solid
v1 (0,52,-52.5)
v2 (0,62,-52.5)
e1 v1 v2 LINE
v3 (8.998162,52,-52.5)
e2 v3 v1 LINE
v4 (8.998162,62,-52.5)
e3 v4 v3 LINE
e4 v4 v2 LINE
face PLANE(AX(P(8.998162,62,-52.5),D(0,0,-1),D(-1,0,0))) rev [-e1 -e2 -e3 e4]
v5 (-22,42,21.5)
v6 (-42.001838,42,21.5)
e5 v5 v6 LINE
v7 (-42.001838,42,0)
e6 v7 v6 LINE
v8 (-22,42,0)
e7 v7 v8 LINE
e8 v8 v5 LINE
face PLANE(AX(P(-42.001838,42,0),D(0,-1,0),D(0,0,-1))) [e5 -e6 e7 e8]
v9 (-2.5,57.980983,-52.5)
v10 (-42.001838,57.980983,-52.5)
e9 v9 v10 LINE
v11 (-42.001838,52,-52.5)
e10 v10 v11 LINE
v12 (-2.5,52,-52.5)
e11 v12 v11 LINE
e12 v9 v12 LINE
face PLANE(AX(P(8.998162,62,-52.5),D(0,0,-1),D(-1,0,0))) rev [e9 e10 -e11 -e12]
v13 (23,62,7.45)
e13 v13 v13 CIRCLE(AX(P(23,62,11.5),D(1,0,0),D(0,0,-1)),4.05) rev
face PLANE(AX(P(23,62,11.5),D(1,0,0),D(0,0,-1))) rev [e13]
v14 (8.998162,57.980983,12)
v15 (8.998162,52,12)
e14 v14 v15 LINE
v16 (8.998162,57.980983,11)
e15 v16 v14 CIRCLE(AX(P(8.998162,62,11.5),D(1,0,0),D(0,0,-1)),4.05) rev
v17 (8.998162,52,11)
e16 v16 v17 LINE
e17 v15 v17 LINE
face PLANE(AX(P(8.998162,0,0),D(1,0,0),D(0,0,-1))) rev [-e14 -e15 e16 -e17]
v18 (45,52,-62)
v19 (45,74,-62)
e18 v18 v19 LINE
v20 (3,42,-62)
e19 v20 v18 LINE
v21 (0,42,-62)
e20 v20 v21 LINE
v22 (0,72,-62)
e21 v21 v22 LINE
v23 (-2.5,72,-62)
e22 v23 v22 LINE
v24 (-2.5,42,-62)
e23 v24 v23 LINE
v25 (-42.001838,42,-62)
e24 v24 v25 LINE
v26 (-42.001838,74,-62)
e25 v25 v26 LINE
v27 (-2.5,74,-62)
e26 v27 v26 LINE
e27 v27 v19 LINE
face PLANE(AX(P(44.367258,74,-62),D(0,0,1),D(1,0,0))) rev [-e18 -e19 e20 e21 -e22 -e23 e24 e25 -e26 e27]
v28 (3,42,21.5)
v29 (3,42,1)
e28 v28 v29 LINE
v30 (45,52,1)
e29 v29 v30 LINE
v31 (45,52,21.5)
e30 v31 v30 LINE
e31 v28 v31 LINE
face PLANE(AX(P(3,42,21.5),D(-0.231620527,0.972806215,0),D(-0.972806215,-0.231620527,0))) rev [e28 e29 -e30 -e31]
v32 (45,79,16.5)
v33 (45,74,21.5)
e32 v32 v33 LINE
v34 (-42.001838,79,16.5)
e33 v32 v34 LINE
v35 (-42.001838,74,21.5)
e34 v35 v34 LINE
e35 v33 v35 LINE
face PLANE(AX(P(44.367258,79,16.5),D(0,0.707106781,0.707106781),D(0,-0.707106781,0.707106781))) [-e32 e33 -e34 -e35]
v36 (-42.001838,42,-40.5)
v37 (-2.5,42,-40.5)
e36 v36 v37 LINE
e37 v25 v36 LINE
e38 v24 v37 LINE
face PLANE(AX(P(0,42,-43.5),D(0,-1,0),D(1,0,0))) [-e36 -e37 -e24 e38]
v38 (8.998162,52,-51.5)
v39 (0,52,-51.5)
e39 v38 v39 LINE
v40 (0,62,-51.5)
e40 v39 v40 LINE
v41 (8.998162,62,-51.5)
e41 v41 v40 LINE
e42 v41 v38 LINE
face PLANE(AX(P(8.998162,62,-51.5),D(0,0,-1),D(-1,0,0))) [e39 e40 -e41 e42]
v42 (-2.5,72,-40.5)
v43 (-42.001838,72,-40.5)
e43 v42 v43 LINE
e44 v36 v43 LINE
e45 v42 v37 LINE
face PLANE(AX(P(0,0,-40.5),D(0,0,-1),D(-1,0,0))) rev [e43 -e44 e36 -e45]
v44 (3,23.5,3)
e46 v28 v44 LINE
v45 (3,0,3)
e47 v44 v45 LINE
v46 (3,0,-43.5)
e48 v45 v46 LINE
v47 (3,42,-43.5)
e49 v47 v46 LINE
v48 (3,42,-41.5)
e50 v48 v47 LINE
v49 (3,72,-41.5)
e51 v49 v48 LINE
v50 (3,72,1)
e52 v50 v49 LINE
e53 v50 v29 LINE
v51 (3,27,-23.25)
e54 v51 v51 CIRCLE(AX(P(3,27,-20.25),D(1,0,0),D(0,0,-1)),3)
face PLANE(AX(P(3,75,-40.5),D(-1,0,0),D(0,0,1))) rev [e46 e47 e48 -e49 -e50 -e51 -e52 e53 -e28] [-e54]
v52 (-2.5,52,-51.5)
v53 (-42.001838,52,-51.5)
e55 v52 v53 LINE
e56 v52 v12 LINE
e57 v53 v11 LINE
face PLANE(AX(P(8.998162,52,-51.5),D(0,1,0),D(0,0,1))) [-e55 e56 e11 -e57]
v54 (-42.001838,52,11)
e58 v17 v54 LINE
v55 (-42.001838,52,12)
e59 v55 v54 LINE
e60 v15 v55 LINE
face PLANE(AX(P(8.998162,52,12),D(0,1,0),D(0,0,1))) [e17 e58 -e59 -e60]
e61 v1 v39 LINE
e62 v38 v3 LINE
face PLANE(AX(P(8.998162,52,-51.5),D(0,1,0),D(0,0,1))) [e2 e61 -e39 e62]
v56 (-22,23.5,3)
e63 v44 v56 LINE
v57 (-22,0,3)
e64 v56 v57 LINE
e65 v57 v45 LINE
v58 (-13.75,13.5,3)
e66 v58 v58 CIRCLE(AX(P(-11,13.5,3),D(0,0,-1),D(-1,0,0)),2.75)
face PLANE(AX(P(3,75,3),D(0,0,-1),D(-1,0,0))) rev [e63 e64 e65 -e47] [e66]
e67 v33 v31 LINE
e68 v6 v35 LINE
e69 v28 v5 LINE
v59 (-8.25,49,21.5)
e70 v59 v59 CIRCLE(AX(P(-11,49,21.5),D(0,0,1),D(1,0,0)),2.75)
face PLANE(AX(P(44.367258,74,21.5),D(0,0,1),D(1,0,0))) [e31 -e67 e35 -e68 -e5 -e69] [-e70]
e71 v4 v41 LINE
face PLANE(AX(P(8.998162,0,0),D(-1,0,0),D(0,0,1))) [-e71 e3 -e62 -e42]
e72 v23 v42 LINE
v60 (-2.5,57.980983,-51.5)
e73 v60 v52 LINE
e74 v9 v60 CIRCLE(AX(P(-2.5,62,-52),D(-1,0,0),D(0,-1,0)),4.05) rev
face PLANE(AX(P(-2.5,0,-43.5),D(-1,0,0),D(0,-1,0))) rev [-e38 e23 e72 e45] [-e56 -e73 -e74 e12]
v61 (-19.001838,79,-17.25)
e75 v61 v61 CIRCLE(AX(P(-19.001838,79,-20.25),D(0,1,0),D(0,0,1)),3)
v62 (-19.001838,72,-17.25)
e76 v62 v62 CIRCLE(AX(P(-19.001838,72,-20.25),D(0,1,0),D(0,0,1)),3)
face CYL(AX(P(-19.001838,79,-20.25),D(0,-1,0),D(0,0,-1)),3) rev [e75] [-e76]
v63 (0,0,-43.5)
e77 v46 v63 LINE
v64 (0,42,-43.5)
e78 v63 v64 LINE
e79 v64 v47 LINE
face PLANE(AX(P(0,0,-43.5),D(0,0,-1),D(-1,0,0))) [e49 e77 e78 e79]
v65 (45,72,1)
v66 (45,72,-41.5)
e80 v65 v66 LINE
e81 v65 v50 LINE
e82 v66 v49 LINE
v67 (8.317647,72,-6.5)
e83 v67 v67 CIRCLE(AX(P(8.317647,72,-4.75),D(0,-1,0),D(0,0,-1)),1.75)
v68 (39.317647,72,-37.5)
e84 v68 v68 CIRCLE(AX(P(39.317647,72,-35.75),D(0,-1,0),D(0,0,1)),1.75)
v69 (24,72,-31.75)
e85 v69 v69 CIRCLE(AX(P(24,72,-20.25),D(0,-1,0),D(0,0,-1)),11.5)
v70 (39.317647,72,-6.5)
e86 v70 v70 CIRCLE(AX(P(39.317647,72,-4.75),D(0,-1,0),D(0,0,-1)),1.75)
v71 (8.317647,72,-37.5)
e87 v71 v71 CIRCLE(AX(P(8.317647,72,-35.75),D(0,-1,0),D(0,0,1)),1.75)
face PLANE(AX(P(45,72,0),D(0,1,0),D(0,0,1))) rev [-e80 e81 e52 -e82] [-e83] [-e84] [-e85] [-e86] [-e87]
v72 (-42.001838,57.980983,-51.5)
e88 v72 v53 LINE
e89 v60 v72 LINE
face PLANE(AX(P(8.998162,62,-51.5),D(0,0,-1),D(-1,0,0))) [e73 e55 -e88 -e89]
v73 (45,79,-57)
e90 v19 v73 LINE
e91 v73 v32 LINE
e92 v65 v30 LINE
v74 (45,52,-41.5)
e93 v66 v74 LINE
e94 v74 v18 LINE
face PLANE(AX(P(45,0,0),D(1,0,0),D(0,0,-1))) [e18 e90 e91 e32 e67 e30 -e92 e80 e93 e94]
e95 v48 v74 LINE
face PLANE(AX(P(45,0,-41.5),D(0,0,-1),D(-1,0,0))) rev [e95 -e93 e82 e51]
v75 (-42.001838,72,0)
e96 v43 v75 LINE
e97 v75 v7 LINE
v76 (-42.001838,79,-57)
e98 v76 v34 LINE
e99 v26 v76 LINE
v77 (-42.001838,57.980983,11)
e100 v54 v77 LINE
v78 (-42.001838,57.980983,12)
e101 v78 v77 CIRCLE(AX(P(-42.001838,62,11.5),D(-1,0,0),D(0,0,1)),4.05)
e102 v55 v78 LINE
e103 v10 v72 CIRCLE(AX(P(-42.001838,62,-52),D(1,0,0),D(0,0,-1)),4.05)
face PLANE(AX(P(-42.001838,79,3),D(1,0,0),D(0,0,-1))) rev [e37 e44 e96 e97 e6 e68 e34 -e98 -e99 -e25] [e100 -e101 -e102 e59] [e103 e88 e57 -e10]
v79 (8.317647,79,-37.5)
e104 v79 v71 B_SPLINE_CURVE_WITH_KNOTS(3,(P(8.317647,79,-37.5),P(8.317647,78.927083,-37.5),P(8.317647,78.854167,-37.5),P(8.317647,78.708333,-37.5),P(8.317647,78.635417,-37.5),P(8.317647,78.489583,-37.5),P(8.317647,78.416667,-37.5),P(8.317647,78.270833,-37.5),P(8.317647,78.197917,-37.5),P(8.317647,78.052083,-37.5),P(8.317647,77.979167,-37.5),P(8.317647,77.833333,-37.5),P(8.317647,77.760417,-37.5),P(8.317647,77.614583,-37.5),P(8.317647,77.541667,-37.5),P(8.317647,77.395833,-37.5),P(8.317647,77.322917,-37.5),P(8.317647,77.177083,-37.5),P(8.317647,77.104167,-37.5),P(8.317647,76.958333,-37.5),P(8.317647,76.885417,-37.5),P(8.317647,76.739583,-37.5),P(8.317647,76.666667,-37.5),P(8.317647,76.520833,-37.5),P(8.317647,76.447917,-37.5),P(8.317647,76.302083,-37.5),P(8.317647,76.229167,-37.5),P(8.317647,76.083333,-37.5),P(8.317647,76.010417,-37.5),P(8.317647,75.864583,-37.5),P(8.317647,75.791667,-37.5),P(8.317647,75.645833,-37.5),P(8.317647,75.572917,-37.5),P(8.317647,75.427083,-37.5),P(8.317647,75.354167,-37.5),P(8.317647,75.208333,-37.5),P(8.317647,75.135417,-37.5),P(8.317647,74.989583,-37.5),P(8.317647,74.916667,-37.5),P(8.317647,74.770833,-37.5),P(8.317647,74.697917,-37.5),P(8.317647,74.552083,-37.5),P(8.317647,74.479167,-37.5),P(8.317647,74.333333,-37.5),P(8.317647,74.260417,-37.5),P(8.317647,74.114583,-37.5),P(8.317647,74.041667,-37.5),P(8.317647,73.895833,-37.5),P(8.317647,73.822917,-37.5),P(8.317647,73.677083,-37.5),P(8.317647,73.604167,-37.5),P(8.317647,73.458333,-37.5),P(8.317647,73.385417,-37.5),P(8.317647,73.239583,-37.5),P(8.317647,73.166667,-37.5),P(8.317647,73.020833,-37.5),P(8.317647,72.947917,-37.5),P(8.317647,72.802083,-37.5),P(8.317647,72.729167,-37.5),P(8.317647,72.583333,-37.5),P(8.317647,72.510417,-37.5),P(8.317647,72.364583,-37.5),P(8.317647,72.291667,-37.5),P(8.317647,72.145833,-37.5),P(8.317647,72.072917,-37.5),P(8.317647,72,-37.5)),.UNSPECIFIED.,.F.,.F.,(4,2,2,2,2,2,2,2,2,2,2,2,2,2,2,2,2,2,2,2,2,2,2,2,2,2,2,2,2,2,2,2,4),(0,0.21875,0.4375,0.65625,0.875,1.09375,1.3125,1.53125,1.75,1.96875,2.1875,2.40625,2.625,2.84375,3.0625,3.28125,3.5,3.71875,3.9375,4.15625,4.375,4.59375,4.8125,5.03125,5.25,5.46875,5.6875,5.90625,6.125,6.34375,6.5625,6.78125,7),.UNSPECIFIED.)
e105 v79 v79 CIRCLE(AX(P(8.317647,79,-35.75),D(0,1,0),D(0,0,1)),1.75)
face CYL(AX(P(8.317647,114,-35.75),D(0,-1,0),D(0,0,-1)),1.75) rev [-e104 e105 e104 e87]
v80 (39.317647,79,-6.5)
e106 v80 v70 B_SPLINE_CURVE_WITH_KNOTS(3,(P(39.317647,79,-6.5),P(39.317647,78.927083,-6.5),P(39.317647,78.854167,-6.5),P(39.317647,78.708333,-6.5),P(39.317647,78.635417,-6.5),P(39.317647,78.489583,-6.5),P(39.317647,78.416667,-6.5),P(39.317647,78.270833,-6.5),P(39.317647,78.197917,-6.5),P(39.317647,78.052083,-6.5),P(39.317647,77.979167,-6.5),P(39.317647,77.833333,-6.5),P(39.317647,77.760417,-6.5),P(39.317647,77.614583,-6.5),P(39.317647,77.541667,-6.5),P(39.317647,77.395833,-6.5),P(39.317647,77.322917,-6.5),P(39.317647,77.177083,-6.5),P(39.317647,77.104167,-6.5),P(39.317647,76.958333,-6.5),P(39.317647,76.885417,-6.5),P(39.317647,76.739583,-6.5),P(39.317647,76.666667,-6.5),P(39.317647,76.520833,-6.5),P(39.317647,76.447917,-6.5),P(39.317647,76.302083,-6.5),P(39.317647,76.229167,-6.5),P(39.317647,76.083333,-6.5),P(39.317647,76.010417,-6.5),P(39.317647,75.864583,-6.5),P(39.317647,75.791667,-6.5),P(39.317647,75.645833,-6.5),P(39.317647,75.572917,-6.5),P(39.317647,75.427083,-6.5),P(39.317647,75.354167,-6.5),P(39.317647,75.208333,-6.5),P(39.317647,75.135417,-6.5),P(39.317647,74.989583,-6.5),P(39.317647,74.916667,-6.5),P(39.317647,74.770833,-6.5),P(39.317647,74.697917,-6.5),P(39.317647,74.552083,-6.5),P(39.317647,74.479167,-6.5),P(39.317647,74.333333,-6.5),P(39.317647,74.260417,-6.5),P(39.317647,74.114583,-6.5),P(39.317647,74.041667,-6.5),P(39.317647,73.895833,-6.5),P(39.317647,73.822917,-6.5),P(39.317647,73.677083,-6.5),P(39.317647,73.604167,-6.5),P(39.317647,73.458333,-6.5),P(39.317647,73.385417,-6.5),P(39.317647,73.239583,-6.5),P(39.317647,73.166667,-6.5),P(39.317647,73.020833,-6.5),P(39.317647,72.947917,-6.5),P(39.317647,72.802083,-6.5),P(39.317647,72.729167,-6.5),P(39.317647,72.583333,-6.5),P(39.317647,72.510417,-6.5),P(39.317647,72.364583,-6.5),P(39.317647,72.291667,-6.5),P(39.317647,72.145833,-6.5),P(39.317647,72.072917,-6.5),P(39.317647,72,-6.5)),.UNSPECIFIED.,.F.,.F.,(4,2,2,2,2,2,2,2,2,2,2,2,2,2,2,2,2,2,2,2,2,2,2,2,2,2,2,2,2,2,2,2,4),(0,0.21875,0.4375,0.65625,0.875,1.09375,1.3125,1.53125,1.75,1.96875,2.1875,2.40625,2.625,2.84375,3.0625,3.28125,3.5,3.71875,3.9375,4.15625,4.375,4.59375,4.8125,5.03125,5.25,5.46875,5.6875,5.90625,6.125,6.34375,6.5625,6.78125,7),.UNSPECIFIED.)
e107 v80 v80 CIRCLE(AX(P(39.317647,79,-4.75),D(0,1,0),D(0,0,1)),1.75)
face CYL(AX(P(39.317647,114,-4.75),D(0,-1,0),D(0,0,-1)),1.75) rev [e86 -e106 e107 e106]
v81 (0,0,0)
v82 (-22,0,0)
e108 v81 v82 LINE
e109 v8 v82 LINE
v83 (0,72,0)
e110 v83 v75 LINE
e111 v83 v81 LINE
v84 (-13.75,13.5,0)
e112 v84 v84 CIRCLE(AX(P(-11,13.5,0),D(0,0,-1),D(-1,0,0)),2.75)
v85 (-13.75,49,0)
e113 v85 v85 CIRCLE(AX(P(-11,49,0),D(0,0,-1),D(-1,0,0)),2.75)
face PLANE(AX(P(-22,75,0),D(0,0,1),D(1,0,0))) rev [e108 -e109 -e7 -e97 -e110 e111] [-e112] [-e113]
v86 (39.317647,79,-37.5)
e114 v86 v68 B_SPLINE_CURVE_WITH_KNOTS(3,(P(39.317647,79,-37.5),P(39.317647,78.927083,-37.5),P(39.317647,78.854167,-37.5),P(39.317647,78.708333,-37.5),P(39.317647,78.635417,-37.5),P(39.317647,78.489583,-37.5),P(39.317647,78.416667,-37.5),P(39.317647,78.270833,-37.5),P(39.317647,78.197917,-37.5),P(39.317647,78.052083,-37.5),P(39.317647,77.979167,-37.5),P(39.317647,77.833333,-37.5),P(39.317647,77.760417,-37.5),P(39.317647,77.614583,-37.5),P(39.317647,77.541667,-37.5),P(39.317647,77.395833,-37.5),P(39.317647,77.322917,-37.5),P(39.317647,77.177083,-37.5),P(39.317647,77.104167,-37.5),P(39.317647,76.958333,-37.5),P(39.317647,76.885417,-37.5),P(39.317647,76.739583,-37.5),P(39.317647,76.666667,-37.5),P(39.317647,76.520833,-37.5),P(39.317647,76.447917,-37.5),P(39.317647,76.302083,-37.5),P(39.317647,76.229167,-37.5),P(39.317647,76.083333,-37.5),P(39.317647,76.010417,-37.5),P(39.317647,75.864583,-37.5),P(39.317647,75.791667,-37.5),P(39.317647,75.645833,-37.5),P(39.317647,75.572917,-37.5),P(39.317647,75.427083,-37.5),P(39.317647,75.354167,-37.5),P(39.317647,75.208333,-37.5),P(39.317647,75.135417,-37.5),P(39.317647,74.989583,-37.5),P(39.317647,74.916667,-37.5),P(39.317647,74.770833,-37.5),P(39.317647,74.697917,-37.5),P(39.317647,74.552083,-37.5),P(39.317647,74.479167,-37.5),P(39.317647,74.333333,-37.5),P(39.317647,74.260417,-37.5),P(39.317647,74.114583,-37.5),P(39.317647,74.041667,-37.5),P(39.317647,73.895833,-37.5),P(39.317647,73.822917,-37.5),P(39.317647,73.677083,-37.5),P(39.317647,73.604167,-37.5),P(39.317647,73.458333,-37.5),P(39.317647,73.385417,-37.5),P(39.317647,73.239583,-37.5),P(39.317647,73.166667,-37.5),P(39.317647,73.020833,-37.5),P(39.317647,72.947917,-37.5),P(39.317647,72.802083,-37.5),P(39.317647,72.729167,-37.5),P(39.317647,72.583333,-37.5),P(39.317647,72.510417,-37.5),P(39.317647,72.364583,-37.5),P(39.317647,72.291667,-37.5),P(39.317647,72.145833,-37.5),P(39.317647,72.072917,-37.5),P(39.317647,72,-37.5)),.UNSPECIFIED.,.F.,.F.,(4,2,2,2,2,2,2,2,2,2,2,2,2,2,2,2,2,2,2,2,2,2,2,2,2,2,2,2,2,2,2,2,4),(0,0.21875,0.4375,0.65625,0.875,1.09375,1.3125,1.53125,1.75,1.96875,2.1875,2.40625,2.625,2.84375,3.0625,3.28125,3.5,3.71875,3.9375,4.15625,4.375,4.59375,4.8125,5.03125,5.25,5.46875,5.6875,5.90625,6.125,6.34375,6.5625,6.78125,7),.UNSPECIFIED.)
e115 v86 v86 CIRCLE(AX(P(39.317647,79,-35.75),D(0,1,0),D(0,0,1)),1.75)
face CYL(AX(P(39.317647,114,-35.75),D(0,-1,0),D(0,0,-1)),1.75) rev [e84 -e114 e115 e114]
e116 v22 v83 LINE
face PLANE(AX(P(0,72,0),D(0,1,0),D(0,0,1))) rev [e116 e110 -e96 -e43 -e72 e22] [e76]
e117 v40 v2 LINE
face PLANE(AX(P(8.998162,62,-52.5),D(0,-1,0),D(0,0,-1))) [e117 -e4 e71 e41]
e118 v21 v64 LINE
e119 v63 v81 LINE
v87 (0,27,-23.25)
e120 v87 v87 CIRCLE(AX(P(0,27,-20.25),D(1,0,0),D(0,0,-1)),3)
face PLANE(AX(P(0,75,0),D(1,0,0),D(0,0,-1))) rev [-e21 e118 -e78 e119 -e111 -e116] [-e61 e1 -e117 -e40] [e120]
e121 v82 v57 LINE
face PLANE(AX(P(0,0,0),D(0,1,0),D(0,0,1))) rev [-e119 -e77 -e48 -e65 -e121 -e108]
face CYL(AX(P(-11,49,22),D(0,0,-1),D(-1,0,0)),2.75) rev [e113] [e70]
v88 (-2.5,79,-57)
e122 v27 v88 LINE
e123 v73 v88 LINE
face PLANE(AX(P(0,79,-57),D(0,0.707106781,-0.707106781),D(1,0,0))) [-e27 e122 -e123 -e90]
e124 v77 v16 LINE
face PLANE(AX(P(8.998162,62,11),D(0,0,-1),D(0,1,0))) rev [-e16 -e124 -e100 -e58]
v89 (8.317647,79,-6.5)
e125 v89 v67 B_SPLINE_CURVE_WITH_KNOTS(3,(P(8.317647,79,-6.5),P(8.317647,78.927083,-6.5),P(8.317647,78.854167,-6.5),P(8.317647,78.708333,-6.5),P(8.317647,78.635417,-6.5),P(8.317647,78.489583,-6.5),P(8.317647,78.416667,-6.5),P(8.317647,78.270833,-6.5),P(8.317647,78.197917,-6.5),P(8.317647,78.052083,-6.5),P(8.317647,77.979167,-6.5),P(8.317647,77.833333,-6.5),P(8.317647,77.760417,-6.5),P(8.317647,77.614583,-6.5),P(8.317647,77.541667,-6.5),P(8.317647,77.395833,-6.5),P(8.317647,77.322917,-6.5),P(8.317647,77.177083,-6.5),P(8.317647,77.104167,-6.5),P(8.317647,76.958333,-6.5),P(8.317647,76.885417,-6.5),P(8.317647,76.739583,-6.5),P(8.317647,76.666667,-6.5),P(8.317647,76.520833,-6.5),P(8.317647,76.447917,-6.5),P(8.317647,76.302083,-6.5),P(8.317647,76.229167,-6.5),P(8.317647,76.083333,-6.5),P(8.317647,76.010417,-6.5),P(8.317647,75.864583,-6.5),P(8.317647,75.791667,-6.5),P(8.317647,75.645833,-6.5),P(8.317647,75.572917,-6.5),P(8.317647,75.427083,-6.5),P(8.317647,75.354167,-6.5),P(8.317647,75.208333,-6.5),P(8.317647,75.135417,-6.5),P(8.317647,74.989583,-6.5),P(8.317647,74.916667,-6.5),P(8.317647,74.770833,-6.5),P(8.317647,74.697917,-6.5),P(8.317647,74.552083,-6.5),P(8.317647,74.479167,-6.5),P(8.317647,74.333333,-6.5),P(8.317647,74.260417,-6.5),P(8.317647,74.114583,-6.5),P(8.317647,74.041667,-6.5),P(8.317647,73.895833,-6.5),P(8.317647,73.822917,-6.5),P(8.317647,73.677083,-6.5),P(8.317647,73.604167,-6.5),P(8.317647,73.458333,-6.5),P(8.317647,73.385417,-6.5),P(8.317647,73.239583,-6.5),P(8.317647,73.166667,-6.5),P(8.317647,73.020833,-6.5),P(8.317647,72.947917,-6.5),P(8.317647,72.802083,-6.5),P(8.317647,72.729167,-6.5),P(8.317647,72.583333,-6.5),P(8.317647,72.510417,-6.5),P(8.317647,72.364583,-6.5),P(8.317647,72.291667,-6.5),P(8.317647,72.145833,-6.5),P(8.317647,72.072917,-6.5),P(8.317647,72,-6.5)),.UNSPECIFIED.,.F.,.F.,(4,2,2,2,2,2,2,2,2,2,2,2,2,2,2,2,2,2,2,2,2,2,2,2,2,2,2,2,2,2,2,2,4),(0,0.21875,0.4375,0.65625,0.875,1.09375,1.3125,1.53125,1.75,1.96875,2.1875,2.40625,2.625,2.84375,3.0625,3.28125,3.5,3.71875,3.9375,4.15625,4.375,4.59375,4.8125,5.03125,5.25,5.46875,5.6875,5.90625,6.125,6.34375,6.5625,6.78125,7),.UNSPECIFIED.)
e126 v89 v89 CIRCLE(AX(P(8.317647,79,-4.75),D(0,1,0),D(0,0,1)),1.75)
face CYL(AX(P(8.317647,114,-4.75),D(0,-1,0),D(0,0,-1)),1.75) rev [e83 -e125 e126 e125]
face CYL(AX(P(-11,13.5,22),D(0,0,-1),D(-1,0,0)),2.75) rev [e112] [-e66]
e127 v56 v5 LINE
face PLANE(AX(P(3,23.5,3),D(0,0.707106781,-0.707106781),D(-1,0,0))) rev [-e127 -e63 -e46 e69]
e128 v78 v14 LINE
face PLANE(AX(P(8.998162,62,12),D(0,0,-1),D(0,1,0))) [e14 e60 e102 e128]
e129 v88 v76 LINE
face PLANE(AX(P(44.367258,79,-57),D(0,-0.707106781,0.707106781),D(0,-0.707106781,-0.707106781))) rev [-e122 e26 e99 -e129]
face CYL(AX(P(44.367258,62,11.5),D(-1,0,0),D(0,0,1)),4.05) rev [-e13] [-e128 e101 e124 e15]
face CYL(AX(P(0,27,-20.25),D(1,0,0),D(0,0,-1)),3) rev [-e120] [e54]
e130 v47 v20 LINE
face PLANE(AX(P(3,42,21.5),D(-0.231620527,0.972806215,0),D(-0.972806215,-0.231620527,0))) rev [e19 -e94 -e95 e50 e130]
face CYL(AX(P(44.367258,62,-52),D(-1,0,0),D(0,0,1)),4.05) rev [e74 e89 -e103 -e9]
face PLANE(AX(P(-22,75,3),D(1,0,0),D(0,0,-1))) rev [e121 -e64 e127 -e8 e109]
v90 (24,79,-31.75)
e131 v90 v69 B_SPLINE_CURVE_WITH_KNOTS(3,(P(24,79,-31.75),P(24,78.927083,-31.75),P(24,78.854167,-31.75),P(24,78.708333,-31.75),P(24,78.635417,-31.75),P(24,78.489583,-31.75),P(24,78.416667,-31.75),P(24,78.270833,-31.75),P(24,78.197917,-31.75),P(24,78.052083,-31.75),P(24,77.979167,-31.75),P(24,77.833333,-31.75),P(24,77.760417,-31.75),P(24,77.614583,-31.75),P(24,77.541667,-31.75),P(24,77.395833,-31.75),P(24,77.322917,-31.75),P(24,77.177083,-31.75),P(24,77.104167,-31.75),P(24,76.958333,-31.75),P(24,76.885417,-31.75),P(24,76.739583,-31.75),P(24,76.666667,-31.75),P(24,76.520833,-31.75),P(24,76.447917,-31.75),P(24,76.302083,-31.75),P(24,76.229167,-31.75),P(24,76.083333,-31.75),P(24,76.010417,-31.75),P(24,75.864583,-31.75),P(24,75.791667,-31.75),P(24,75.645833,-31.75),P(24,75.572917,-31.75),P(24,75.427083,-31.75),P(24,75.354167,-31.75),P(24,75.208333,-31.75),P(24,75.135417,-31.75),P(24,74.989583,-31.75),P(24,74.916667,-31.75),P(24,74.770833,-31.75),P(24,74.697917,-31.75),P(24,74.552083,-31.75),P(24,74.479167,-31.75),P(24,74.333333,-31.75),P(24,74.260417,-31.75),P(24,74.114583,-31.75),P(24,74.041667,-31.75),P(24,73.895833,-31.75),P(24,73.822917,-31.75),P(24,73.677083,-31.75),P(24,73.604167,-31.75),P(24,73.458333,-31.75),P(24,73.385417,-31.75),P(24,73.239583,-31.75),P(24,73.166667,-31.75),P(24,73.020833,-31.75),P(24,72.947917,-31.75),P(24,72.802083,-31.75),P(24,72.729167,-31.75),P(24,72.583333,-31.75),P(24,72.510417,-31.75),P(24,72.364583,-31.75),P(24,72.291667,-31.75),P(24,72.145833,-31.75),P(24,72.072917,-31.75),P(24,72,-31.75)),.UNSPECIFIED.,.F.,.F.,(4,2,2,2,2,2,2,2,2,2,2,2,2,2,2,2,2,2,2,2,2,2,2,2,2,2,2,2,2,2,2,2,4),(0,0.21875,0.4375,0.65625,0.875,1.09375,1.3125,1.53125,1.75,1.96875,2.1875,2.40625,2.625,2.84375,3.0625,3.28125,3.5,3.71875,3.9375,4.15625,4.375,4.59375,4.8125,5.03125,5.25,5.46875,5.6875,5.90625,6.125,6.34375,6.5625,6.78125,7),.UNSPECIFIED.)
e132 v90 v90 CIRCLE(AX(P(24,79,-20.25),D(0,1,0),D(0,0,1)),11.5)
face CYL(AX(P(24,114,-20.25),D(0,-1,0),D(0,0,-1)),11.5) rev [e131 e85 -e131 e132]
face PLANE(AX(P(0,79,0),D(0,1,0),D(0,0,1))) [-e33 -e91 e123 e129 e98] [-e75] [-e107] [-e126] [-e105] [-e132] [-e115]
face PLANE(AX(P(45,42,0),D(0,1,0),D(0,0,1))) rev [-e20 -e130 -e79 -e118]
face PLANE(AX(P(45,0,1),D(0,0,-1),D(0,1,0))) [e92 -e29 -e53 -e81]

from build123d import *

# Parameters (mm, degrees)
BOSS_EXTRUDE1_DEPTH      = 75
SKETCH4_R                = 3
CUT_EXTRUDE1_DEPTH       = 3
BOSS_EXTRUDE2_DEPTH      = 4
BOSS_EXTRUDE2_DEPTH_BACK = 3
SKETCH2_R                = 3
SKETCH8_W                = 20.001838136
SKETCH8_H                = 30
BOSS_EXTRUDE6_DEPTH      = 3
SKETCH9_W                = 39.501838136
SKETCH9_H                = 30
BOSS_EXTRUDE7_DEPTH      = 3
SKETCH10_R               = 4.05
BOSS_EXTRUDE8_DEPTH      = 45.001838136
SKETCH11_R               = 4.05
BOSS_EXTRUDE9_DEPTH      = 42
SKETCH12_R               = 11.5
SKETCH12_R_2             = 1.75
CUT_EXTRUDE2_DEPTH       = 42
CUT_EXTRUDE3_START       = -5.5
SKETCH13_R               = 4.05
CUT_EXTRUDE3_DEPTH       = 5.5
SKETCH14_W               = 47.5
SKETCH14_H               = 18.5
BOSS_EXTRUDE11_DEPTH     = 7
CHAMFER1_START           = 96.166522241
CHAMFER1_OUTLINE_W       = 47.5
CHAMFER1_OUTLINE_H       = 10
CHAMFER1_DEPTH           = 4.833477759
SKETCH17_W               = 45
SKETCH17_H               = 18.5
BOSS_EXTRUDE12_DEPTH     = 30
CUT_EXTRUDE5_DEPTH       = 111.611934257
CUT_EXTRUDE5_DEPTH_BACK  = 111.611934257
SKETCH19_R               = 2.75
CUT_EXTRUDE6_DEPTH       = 22
BOSS_EXTRUDE13_START     = -22
SKETCH20_R               = 4.05
BOSS_EXTRUDE13_DEPTH     = 22
SKETCH22_W               = 1
SKETCH22_H               = 10
CUT_EXTRUDE_THIN1_DEPTH  = 51
CHAMFER2_SIZE            = 18.5


with BuildPart() as part:
    # Sketch1 → Boss-Extrude1 (new body)
    with BuildSketch(Plane(origin=(0, 0, 0), x_dir=(1, 0, 0), z_dir=(0, 1, 0))):
        Polygon((0, 0), (0, 40.5), (3, 40.5), (3, -3), (-22, -3), (-22, 0), align=None)
    extrude(amount=BOSS_EXTRUDE1_DEPTH)

    # Sketch4 → Cut-Extrude1 (cut)
    with BuildSketch(Plane(origin=(3, 0, 0), x_dir=(0, 0, -1), z_dir=(1, 0, 0))):
        with Locations((20.25, 27)):
            Circle(SKETCH4_R)
    extrude(amount=-CUT_EXTRUDE1_DEPTH, mode=Mode.SUBTRACT)

    # Sketch2 → Boss-Extrude2 (add, two sides: drawn at the far end of the back side and taken through both)
    with BuildSketch(Plane(origin=(0, 75, 0), x_dir=(1, 0, 0), z_dir=(0, 1, 0)).offset(-BOSS_EXTRUDE2_DEPTH_BACK)):
        Polygon((-0.001838136, 40.5), (-42.001838136, 40.5), (-42.001838136, 0), (-42.001838136, -3), (3, -3), (3, 40.5), align=None)
        with Locations(Location((-19.001838136, 20.25, 0), (0, 0, 270))):
            Circle(SKETCH2_R, mode=Mode.SUBTRACT)
    extrude(amount=BOSS_EXTRUDE2_DEPTH + BOSS_EXTRUDE2_DEPTH_BACK)

    # Sketch8 → Boss-Extrude6 (add)
    with BuildSketch(Plane.XY.offset(3)):
        with Locations((-32.000919068, 57)):
            Rectangle(SKETCH8_W, SKETCH8_H)
    extrude(amount=-BOSS_EXTRUDE6_DEPTH)

    # Sketch9 → Boss-Extrude7 (add)
    with BuildSketch(Plane(origin=(0, 0, -40.5), x_dir=(-1, 0, 0), z_dir=(0, 0, -1))):
        Polygon((42.001838136, 79), (-3, 79), (-3, 0), (0, 0), (0, 72), (42.001838136, 72), align=None)
        with Locations((22.250919068, 57)):
            Rectangle(SKETCH9_W, SKETCH9_H)
    extrude(amount=BOSS_EXTRUDE7_DEPTH)

    # Sketch10 → Boss-Extrude8 (add)
    with BuildSketch(Plane.ZY.offset(42.001838136)):
        Polygon((3, 79), (16.5, 79), (21.5, 74), (21.5, 42), (3, 42), align=None)
        with Locations((11.5, 62)):
            Circle(SKETCH10_R, mode=Mode.SUBTRACT)
    boss_extrude8 = extrude(amount=-BOSS_EXTRUDE8_DEPTH)

    # Sketch11 → Boss-Extrude9 (add)
    with BuildSketch(Plane(origin=(3, 0, 0), x_dir=(0, 0, -1), z_dir=(1, 0, 0))):
        Polygon((-1, 42), (-1, 72), (41.5, 72), (41.5, 42), (43.5, 42), (43.5, 79), (-16.5, 79), (-21.5, 74), (-21.5, 42), (-3, 42), align=None)
        with Locations(Location((-11.5, 62, 0), (0, 0, 180))):
            Circle(SKETCH11_R, mode=Mode.SUBTRACT)
    extrude(amount=BOSS_EXTRUDE9_DEPTH)

    # Mirror3: Boss-Extrude8 across plane
    add(boss_extrude8.mirror(Plane.XY.offset(-20.25)))

    # Sketch12 → Cut-Extrude2 (cut)
    with BuildSketch(Plane.XZ.offset(-72)):
        with Locations(Location((24, -20.25, 0), (0, 0, 270))):
            Circle(SKETCH12_R)
        with Locations(Location((39.317647059, -4.75, 0), (0, 0, 270))):
            Circle(SKETCH12_R_2)
        with Locations(Location((8.317647059, -4.75, 0), (0, 0, 270))):
            Circle(SKETCH12_R_2)
        with Locations(Location((8.317647059, -35.75, 0), (0, 0, 270))):
            Circle(SKETCH12_R_2)
        with Locations(Location((39.317647059, -35.75, 0), (0, 0, 270))):
            Circle(SKETCH12_R_2)
    extrude(amount=-CUT_EXTRUDE2_DEPTH, mode=Mode.SUBTRACT)

    # Sketch13 → Cut-Extrude3 (cut)
    with BuildSketch(Plane(origin=(3, 0, 0), x_dir=(0, 0, -1), z_dir=(1, 0, 0)).offset(CUT_EXTRUDE3_START)):
        Polygon((43.5, 42), (62, 42), (62, 74), (57, 79), (43.5, 79), align=None)
        with Locations(Location((52, 62, 0), (0, 0, 270))):
            Circle(SKETCH13_R, mode=Mode.SUBTRACT)
    extrude(amount=CUT_EXTRUDE3_DEPTH, mode=Mode.SUBTRACT)

    # Sketch14 → Boss-Extrude11 (add)
    with BuildSketch(Plane(origin=(0, 79, 0), x_dir=(1, 0, 0), z_dir=(0, 1, 0))):
        with Locations((21.25, 52.75)):
            Rectangle(SKETCH14_W, SKETCH14_H)
    extrude(amount=-BOSS_EXTRUDE11_DEPTH)

    # Chamfer1: read off the stored shape, not the designer's step
    # Chamfer1 outline → Chamfer1 (cut)
    with BuildSketch(Plane(origin=(0, 0, 0), x_dir=(1, 0, 0), z_dir=(0, 0.7071067811865466, -0.7071067811865486)).offset(CHAMFER1_START)):
        with Locations((21.25, -12)):
            Rectangle(CHAMFER1_OUTLINE_W, CHAMFER1_OUTLINE_H)
    extrude(amount=CHAMFER1_DEPTH, mode=Mode.SUBTRACT)

    # Sketch17 → Boss-Extrude12 (add)
    with BuildSketch(Plane(origin=(0, 72, 0), x_dir=(-1, 0, 0), z_dir=(0, -1, 0))):
        with Locations((-22.5, 52.75)):
            Rectangle(SKETCH17_W, SKETCH17_H)
    extrude(amount=BOSS_EXTRUDE12_DEPTH)

    # Sketch18 → Cut-Extrude5 (cut, two sides: drawn at the far end of the back side and taken through both)
    with BuildSketch(Plane(origin=(0, 0, 1), x_dir=(-1, 0, 0), z_dir=(0, 0, -1)).offset(-CUT_EXTRUDE5_DEPTH_BACK)):
        Polygon((-45, 52), (-45, 42), (-3, 42), align=None)
    extrude(amount=CUT_EXTRUDE5_DEPTH + CUT_EXTRUDE5_DEPTH_BACK, mode=Mode.SUBTRACT)

    # Sketch19 → Cut-Extrude6 (cut)
    with BuildSketch(Plane(origin=(0, 0, 0), x_dir=(-1, 0, 0), z_dir=(0, 0, -1))):
        with Locations((11, 49)):
            Circle(SKETCH19_R)
        with Locations((11, 13.5)):
            Circle(SKETCH19_R)
    extrude(amount=-CUT_EXTRUDE6_DEPTH, mode=Mode.SUBTRACT)

    # Sketch20 → Boss-Extrude13 (add)
    with BuildSketch(Plane(origin=(45, 0, 0), x_dir=(0, 0, -1), z_dir=(1, 0, 0)).offset(BOSS_EXTRUDE13_START)):
        with Locations(Location((-11.5, 62, 0), (0, 0, 180))):
            Circle(SKETCH20_R)
    extrude(amount=BOSS_EXTRUDE13_DEPTH)

    # Sketch22 → Cut-Extrude-Thin1 (cut)
    with BuildSketch(Plane.ZY.offset(42.001838136)):
        with Locations((-52, 57)):
            Rectangle(SKETCH22_W, SKETCH22_H)
        with Locations((11.5, 57)):
            Rectangle(SKETCH22_W, SKETCH22_H)
    extrude(amount=-CUT_EXTRUDE_THIN1_DEPTH, mode=Mode.SUBTRACT)

    # Chamfer2
    chamfer2_edges = [part.edges().sort_by_distance(p)[0] for p in [
        (-9.5, 42, 3),
    ]]
    chamfer(chamfer2_edges, length=CHAMFER2_SIZE - 0.0001)  # a hair under: the kernel refuses the full size


solid = part.part
